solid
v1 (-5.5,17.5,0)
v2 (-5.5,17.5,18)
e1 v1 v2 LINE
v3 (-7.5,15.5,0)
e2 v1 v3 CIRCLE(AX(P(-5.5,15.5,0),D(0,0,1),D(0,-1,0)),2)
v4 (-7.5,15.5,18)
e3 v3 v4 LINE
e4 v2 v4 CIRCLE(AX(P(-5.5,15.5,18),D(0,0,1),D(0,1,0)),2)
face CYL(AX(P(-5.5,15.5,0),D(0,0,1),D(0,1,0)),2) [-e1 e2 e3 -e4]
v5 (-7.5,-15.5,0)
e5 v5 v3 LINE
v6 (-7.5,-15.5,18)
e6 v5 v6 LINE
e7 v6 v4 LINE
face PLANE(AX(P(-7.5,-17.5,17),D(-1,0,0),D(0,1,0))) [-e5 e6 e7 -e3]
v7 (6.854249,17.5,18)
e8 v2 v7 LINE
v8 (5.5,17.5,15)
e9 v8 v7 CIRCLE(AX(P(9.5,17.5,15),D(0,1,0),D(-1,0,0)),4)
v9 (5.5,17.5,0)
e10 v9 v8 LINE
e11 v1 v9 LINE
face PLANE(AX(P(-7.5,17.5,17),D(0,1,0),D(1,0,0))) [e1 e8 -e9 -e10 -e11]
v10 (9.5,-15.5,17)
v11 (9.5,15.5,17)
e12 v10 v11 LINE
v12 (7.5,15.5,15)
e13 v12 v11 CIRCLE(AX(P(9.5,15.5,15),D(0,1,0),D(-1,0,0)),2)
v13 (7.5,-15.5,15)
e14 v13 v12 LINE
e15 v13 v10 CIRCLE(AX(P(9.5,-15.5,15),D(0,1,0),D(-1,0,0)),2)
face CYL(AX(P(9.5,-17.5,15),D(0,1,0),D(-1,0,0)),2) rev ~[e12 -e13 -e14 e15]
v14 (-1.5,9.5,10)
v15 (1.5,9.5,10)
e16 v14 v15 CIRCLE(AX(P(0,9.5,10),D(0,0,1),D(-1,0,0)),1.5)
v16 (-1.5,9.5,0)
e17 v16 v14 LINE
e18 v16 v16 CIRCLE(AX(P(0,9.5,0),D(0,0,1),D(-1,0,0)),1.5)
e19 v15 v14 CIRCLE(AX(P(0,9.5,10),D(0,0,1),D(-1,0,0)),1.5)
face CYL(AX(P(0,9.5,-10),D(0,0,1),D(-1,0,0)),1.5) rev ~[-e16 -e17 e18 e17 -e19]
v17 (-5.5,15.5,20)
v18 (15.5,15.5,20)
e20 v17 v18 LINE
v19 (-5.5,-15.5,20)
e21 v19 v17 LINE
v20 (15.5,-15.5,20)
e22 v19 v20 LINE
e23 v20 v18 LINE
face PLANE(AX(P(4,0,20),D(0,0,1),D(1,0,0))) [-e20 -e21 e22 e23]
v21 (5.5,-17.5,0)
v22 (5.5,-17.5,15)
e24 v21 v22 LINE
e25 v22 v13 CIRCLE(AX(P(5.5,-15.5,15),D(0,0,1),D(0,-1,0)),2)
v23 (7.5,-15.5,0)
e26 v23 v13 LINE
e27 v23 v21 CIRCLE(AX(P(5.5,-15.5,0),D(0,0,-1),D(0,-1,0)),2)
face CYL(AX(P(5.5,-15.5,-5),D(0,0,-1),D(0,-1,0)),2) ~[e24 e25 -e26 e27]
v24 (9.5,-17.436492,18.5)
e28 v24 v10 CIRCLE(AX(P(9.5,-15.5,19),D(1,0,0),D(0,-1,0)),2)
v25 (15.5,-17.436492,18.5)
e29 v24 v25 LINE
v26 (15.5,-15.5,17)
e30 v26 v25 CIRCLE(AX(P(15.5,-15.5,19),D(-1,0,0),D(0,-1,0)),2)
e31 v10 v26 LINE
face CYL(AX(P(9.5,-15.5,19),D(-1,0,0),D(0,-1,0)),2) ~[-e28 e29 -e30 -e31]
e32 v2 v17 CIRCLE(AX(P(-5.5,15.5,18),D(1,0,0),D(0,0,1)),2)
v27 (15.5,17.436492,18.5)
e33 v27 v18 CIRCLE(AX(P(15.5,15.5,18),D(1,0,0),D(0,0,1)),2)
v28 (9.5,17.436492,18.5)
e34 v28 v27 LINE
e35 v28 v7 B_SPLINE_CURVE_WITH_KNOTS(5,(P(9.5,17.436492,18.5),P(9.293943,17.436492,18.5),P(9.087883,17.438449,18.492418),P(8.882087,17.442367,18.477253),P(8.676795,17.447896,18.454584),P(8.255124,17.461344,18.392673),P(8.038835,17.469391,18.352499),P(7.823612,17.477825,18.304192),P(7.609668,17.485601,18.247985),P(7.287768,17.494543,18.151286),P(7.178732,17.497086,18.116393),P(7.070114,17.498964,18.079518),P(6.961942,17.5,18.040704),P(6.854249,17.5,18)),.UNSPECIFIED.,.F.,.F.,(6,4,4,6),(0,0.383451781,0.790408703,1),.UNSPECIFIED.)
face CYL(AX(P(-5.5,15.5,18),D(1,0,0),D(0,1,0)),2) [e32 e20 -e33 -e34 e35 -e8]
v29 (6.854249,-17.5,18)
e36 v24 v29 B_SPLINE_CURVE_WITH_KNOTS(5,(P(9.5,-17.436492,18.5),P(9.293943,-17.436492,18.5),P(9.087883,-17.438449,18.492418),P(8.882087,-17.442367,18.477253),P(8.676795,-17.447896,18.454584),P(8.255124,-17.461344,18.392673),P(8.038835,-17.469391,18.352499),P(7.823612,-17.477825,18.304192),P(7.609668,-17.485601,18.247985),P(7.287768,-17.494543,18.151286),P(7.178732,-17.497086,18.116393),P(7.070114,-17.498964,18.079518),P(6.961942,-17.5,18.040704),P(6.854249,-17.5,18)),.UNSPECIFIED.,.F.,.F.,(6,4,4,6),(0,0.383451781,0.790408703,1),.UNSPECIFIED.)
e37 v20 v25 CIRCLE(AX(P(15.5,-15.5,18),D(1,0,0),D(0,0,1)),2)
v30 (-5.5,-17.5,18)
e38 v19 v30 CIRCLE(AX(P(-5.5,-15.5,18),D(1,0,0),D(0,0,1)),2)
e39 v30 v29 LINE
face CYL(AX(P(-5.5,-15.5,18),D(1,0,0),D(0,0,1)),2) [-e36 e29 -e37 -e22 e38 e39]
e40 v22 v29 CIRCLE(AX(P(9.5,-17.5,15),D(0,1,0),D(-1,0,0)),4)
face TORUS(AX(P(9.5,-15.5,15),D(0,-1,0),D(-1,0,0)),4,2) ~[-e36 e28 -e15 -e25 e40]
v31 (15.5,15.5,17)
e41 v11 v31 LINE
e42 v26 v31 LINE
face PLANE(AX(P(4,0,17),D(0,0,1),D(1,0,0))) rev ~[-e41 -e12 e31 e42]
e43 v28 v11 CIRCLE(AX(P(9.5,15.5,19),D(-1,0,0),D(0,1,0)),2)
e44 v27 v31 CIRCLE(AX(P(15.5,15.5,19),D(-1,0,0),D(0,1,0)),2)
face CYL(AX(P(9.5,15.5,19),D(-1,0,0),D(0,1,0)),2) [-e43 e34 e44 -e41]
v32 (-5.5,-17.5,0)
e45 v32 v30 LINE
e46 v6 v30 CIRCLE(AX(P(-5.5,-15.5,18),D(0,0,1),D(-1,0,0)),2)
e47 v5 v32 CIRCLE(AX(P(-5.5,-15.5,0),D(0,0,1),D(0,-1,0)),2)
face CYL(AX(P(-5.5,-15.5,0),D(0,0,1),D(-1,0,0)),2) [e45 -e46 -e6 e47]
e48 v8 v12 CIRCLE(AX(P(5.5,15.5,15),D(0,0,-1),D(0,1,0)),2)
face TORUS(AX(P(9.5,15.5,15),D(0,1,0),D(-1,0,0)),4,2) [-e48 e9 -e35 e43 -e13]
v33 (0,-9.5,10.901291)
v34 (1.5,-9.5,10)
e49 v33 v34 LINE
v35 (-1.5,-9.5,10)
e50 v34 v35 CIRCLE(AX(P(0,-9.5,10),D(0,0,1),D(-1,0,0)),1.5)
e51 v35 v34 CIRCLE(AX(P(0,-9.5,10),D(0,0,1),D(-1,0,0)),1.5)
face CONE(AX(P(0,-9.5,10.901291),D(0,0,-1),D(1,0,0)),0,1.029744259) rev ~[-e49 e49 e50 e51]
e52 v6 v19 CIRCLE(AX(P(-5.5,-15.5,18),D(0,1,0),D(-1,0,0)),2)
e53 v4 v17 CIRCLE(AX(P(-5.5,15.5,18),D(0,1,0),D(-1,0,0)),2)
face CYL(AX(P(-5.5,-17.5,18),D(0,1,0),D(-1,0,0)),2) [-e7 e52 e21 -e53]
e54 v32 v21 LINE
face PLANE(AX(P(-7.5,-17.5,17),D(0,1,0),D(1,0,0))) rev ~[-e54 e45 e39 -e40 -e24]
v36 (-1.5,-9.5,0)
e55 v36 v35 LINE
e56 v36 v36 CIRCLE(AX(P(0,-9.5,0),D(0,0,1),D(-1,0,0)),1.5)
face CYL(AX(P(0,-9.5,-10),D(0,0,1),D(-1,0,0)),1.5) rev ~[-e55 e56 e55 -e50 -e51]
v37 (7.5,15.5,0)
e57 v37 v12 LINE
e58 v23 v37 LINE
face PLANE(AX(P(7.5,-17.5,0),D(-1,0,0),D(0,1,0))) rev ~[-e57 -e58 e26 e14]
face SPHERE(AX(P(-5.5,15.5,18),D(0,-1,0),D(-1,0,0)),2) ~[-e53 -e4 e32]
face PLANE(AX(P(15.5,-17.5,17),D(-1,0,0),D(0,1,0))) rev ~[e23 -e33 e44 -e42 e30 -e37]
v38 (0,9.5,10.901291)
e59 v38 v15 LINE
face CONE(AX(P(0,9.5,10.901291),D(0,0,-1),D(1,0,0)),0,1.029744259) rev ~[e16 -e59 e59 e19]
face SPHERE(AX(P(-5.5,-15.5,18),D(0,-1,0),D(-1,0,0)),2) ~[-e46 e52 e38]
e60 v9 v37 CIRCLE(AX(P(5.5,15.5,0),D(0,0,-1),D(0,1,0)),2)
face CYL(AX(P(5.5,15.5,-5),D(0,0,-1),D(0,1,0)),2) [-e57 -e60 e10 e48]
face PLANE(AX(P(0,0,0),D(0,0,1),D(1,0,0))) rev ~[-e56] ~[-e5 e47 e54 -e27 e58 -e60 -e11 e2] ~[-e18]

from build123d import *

# Parameters (mm, degrees)
F0_W         = 15
F0_H         = 35
F1_DEPTH     = 17
F2_W         = 23
F2_H         = 35
F3_DEPTH     = 3
F5_D         = 3
F5_DEPTH     = 10
F5_TIP       = 0.9012909285
F6_F1_R      = 2
F6_F2_R      = 2
F6_F3_R      = 2
F6_F4_R      = 2
F6_T5_DEPTH  = 20
F6_T7_DEPTH  = 11
F6_T10_ANGLE = 90
F6_T11_DEPTH = 20
F6_T13_DEPTH = 11
F6_T16_ANGLE = 90


# Not quite as in the source:
# - a fillet or chamfer that OpenCascade refuses, or shapes differently, is made with other operations: its cross-section is extruded or revolved along the edge and cut away or added


with BuildPart() as f1:
    # F0 (on Top) → F1 (new body)
    with BuildSketch(Plane.XY):
        Rectangle(F0_W, F0_H)
    extrude(amount=F1_DEPTH)

    # F2 (on face) → F3 (join)
    with BuildSketch(Plane.XY.offset(17)):
        with Locations((4, 0)):
            Rectangle(F2_W, F2_H)
    extrude(amount=F3_DEPTH)

    # F5
    with Locations(Plane(origin=(0, 0, 0), x_dir=(1, 0, 0), z_dir=(0, 0, -1))):
        with Locations((0, 9.5), (0, -9.5)):
            Hole(F5_D / 2, depth=F5_DEPTH)
            with Locations((0, 0, -(F5_DEPTH + F5_TIP / 2))):  # 118° drill point
                Cone(0, F5_D / 2, F5_TIP, mode=Mode.SUBTRACT)

    # F6: fillet of radius 2 on 8 edges, made by hand

    # F6_f1
    f6_f1_edges = [f1.edges().sort_by_distance(p)[0] for p in [
        (-7.5, 0, 20),
    ]]
    fillet(f6_f1_edges, radius=F6_F1_R)

    # F6_f2
    f6_f2_edges = [f1.edges().sort_by_distance(p)[0] for p in [
        (7.5, 0, 17),
    ]]
    fillet(f6_f2_edges, radius=F6_F2_R)

    # F6_f3
    f6_f3_edges = [f1.edges().sort_by_distance(p)[0] for p in [
        (5, -17.5, 20),
    ]]
    fillet(f6_f3_edges, radius=F6_F3_R)

    # F6_f4
    f6_f4_edges = [f1.edges().sort_by_distance(p)[0] for p in [
        (5, 17.5, 20),
    ]]
    fillet(f6_f4_edges, radius=F6_F4_R)

    # F6_s6 → F6_t5 (cut)
    with BuildSketch(Plane.XY.offset(-5)):
        with BuildLine():
            ThreePointArc((5.5, -17.5), (6.9142135624, -16.9142135624), (7.5, -15.5))
            Line((7.5, -15.5), (7.54, -15.5))
            Line((7.54, -15.5), (7.54, -17.54))
            Line((7.54, -17.54), (5.5, -17.54))
            Line((5.5, -17.54), (5.5, -17.5))
        make_face()
    extrude(amount=F6_T5_DEPTH, mode=Mode.SUBTRACT)

    # F6_s8 → F6_t7 (cut)
    with BuildSketch(Plane.YZ.offset(9.5)):
        with BuildLine():
            ThreePointArc((-17.5, 19), (-16.9142135624, 17.5857864376), (-15.5, 17))
            Line((-15.5, 17), (-15.5, 16.96))
            Line((-15.5, 16.96), (-17.54, 16.96))
            Line((-17.54, 16.96), (-17.54, 19))
            Line((-17.54, 19), (-17.5, 19))
        make_face()
    extrude(amount=F6_T7_DEPTH, mode=Mode.SUBTRACT)

    # F6_s9 → F6_t10 (revolve, cut)
    with BuildSketch(Plane.XY.offset(15)):
        with BuildLine():
            ThreePointArc((5.5, -17.5), (6.9142135624, -16.9142135624), (7.5, -15.5))
            Line((7.5, -15.5), (7.54, -15.5))
            Line((7.54, -15.5), (7.54, -17.54))
            Line((7.54, -17.54), (5.5, -17.54))
            Line((5.5, -17.54), (5.5, -17.5))
        make_face()
    revolve(axis=Axis((9.5, -17.5, 15), (0, 1, 0)), revolution_arc=F6_T10_ANGLE, mode=Mode.SUBTRACT)

    # F6_s12 → F6_t11 (cut)
    with BuildSketch(Plane.XY.offset(-5)):
        with BuildLine():
            ThreePointArc((5.5, 17.5), (6.9142135624, 16.9142135624), (7.5, 15.5))
            Line((7.5, 15.5), (7.54, 15.5))
            Line((7.54, 15.5), (7.54, 17.54))
            Line((7.54, 17.54), (5.5, 17.54))
            Line((5.5, 17.54), (5.5, 17.5))
        make_face()
    extrude(amount=F6_T11_DEPTH, mode=Mode.SUBTRACT)

    # F6_s14 → F6_t13 (cut)
    with BuildSketch(Plane.YZ.offset(9.5)):
        with BuildLine():
            ThreePointArc((17.5, 19), (16.9142135624, 17.5857864376), (15.5, 17))
            Line((15.5, 17), (15.5, 16.96))
            Line((15.5, 16.96), (17.54, 16.96))
            Line((17.54, 16.96), (17.54, 19))
            Line((17.54, 19), (17.5, 19))
        make_face()
    extrude(amount=F6_T13_DEPTH, mode=Mode.SUBTRACT)

    # F6_s15 → F6_t16 (revolve, cut)
    with BuildSketch(Plane.XY.offset(15)):
        with BuildLine():
            ThreePointArc((5.5, 17.5), (6.9142135624, 16.9142135624), (7.5, 15.5))
            Line((7.5, 15.5), (7.54, 15.5))
            Line((7.54, 15.5), (7.54, 17.54))
            Line((7.54, 17.54), (5.5, 17.54))
            Line((5.5, 17.54), (5.5, 17.5))
        make_face()
    revolve(axis=Axis((9.5, 17.5, 15), (0, 1, 0)), revolution_arc=F6_T16_ANGLE, mode=Mode.SUBTRACT)


solid = f1.part
